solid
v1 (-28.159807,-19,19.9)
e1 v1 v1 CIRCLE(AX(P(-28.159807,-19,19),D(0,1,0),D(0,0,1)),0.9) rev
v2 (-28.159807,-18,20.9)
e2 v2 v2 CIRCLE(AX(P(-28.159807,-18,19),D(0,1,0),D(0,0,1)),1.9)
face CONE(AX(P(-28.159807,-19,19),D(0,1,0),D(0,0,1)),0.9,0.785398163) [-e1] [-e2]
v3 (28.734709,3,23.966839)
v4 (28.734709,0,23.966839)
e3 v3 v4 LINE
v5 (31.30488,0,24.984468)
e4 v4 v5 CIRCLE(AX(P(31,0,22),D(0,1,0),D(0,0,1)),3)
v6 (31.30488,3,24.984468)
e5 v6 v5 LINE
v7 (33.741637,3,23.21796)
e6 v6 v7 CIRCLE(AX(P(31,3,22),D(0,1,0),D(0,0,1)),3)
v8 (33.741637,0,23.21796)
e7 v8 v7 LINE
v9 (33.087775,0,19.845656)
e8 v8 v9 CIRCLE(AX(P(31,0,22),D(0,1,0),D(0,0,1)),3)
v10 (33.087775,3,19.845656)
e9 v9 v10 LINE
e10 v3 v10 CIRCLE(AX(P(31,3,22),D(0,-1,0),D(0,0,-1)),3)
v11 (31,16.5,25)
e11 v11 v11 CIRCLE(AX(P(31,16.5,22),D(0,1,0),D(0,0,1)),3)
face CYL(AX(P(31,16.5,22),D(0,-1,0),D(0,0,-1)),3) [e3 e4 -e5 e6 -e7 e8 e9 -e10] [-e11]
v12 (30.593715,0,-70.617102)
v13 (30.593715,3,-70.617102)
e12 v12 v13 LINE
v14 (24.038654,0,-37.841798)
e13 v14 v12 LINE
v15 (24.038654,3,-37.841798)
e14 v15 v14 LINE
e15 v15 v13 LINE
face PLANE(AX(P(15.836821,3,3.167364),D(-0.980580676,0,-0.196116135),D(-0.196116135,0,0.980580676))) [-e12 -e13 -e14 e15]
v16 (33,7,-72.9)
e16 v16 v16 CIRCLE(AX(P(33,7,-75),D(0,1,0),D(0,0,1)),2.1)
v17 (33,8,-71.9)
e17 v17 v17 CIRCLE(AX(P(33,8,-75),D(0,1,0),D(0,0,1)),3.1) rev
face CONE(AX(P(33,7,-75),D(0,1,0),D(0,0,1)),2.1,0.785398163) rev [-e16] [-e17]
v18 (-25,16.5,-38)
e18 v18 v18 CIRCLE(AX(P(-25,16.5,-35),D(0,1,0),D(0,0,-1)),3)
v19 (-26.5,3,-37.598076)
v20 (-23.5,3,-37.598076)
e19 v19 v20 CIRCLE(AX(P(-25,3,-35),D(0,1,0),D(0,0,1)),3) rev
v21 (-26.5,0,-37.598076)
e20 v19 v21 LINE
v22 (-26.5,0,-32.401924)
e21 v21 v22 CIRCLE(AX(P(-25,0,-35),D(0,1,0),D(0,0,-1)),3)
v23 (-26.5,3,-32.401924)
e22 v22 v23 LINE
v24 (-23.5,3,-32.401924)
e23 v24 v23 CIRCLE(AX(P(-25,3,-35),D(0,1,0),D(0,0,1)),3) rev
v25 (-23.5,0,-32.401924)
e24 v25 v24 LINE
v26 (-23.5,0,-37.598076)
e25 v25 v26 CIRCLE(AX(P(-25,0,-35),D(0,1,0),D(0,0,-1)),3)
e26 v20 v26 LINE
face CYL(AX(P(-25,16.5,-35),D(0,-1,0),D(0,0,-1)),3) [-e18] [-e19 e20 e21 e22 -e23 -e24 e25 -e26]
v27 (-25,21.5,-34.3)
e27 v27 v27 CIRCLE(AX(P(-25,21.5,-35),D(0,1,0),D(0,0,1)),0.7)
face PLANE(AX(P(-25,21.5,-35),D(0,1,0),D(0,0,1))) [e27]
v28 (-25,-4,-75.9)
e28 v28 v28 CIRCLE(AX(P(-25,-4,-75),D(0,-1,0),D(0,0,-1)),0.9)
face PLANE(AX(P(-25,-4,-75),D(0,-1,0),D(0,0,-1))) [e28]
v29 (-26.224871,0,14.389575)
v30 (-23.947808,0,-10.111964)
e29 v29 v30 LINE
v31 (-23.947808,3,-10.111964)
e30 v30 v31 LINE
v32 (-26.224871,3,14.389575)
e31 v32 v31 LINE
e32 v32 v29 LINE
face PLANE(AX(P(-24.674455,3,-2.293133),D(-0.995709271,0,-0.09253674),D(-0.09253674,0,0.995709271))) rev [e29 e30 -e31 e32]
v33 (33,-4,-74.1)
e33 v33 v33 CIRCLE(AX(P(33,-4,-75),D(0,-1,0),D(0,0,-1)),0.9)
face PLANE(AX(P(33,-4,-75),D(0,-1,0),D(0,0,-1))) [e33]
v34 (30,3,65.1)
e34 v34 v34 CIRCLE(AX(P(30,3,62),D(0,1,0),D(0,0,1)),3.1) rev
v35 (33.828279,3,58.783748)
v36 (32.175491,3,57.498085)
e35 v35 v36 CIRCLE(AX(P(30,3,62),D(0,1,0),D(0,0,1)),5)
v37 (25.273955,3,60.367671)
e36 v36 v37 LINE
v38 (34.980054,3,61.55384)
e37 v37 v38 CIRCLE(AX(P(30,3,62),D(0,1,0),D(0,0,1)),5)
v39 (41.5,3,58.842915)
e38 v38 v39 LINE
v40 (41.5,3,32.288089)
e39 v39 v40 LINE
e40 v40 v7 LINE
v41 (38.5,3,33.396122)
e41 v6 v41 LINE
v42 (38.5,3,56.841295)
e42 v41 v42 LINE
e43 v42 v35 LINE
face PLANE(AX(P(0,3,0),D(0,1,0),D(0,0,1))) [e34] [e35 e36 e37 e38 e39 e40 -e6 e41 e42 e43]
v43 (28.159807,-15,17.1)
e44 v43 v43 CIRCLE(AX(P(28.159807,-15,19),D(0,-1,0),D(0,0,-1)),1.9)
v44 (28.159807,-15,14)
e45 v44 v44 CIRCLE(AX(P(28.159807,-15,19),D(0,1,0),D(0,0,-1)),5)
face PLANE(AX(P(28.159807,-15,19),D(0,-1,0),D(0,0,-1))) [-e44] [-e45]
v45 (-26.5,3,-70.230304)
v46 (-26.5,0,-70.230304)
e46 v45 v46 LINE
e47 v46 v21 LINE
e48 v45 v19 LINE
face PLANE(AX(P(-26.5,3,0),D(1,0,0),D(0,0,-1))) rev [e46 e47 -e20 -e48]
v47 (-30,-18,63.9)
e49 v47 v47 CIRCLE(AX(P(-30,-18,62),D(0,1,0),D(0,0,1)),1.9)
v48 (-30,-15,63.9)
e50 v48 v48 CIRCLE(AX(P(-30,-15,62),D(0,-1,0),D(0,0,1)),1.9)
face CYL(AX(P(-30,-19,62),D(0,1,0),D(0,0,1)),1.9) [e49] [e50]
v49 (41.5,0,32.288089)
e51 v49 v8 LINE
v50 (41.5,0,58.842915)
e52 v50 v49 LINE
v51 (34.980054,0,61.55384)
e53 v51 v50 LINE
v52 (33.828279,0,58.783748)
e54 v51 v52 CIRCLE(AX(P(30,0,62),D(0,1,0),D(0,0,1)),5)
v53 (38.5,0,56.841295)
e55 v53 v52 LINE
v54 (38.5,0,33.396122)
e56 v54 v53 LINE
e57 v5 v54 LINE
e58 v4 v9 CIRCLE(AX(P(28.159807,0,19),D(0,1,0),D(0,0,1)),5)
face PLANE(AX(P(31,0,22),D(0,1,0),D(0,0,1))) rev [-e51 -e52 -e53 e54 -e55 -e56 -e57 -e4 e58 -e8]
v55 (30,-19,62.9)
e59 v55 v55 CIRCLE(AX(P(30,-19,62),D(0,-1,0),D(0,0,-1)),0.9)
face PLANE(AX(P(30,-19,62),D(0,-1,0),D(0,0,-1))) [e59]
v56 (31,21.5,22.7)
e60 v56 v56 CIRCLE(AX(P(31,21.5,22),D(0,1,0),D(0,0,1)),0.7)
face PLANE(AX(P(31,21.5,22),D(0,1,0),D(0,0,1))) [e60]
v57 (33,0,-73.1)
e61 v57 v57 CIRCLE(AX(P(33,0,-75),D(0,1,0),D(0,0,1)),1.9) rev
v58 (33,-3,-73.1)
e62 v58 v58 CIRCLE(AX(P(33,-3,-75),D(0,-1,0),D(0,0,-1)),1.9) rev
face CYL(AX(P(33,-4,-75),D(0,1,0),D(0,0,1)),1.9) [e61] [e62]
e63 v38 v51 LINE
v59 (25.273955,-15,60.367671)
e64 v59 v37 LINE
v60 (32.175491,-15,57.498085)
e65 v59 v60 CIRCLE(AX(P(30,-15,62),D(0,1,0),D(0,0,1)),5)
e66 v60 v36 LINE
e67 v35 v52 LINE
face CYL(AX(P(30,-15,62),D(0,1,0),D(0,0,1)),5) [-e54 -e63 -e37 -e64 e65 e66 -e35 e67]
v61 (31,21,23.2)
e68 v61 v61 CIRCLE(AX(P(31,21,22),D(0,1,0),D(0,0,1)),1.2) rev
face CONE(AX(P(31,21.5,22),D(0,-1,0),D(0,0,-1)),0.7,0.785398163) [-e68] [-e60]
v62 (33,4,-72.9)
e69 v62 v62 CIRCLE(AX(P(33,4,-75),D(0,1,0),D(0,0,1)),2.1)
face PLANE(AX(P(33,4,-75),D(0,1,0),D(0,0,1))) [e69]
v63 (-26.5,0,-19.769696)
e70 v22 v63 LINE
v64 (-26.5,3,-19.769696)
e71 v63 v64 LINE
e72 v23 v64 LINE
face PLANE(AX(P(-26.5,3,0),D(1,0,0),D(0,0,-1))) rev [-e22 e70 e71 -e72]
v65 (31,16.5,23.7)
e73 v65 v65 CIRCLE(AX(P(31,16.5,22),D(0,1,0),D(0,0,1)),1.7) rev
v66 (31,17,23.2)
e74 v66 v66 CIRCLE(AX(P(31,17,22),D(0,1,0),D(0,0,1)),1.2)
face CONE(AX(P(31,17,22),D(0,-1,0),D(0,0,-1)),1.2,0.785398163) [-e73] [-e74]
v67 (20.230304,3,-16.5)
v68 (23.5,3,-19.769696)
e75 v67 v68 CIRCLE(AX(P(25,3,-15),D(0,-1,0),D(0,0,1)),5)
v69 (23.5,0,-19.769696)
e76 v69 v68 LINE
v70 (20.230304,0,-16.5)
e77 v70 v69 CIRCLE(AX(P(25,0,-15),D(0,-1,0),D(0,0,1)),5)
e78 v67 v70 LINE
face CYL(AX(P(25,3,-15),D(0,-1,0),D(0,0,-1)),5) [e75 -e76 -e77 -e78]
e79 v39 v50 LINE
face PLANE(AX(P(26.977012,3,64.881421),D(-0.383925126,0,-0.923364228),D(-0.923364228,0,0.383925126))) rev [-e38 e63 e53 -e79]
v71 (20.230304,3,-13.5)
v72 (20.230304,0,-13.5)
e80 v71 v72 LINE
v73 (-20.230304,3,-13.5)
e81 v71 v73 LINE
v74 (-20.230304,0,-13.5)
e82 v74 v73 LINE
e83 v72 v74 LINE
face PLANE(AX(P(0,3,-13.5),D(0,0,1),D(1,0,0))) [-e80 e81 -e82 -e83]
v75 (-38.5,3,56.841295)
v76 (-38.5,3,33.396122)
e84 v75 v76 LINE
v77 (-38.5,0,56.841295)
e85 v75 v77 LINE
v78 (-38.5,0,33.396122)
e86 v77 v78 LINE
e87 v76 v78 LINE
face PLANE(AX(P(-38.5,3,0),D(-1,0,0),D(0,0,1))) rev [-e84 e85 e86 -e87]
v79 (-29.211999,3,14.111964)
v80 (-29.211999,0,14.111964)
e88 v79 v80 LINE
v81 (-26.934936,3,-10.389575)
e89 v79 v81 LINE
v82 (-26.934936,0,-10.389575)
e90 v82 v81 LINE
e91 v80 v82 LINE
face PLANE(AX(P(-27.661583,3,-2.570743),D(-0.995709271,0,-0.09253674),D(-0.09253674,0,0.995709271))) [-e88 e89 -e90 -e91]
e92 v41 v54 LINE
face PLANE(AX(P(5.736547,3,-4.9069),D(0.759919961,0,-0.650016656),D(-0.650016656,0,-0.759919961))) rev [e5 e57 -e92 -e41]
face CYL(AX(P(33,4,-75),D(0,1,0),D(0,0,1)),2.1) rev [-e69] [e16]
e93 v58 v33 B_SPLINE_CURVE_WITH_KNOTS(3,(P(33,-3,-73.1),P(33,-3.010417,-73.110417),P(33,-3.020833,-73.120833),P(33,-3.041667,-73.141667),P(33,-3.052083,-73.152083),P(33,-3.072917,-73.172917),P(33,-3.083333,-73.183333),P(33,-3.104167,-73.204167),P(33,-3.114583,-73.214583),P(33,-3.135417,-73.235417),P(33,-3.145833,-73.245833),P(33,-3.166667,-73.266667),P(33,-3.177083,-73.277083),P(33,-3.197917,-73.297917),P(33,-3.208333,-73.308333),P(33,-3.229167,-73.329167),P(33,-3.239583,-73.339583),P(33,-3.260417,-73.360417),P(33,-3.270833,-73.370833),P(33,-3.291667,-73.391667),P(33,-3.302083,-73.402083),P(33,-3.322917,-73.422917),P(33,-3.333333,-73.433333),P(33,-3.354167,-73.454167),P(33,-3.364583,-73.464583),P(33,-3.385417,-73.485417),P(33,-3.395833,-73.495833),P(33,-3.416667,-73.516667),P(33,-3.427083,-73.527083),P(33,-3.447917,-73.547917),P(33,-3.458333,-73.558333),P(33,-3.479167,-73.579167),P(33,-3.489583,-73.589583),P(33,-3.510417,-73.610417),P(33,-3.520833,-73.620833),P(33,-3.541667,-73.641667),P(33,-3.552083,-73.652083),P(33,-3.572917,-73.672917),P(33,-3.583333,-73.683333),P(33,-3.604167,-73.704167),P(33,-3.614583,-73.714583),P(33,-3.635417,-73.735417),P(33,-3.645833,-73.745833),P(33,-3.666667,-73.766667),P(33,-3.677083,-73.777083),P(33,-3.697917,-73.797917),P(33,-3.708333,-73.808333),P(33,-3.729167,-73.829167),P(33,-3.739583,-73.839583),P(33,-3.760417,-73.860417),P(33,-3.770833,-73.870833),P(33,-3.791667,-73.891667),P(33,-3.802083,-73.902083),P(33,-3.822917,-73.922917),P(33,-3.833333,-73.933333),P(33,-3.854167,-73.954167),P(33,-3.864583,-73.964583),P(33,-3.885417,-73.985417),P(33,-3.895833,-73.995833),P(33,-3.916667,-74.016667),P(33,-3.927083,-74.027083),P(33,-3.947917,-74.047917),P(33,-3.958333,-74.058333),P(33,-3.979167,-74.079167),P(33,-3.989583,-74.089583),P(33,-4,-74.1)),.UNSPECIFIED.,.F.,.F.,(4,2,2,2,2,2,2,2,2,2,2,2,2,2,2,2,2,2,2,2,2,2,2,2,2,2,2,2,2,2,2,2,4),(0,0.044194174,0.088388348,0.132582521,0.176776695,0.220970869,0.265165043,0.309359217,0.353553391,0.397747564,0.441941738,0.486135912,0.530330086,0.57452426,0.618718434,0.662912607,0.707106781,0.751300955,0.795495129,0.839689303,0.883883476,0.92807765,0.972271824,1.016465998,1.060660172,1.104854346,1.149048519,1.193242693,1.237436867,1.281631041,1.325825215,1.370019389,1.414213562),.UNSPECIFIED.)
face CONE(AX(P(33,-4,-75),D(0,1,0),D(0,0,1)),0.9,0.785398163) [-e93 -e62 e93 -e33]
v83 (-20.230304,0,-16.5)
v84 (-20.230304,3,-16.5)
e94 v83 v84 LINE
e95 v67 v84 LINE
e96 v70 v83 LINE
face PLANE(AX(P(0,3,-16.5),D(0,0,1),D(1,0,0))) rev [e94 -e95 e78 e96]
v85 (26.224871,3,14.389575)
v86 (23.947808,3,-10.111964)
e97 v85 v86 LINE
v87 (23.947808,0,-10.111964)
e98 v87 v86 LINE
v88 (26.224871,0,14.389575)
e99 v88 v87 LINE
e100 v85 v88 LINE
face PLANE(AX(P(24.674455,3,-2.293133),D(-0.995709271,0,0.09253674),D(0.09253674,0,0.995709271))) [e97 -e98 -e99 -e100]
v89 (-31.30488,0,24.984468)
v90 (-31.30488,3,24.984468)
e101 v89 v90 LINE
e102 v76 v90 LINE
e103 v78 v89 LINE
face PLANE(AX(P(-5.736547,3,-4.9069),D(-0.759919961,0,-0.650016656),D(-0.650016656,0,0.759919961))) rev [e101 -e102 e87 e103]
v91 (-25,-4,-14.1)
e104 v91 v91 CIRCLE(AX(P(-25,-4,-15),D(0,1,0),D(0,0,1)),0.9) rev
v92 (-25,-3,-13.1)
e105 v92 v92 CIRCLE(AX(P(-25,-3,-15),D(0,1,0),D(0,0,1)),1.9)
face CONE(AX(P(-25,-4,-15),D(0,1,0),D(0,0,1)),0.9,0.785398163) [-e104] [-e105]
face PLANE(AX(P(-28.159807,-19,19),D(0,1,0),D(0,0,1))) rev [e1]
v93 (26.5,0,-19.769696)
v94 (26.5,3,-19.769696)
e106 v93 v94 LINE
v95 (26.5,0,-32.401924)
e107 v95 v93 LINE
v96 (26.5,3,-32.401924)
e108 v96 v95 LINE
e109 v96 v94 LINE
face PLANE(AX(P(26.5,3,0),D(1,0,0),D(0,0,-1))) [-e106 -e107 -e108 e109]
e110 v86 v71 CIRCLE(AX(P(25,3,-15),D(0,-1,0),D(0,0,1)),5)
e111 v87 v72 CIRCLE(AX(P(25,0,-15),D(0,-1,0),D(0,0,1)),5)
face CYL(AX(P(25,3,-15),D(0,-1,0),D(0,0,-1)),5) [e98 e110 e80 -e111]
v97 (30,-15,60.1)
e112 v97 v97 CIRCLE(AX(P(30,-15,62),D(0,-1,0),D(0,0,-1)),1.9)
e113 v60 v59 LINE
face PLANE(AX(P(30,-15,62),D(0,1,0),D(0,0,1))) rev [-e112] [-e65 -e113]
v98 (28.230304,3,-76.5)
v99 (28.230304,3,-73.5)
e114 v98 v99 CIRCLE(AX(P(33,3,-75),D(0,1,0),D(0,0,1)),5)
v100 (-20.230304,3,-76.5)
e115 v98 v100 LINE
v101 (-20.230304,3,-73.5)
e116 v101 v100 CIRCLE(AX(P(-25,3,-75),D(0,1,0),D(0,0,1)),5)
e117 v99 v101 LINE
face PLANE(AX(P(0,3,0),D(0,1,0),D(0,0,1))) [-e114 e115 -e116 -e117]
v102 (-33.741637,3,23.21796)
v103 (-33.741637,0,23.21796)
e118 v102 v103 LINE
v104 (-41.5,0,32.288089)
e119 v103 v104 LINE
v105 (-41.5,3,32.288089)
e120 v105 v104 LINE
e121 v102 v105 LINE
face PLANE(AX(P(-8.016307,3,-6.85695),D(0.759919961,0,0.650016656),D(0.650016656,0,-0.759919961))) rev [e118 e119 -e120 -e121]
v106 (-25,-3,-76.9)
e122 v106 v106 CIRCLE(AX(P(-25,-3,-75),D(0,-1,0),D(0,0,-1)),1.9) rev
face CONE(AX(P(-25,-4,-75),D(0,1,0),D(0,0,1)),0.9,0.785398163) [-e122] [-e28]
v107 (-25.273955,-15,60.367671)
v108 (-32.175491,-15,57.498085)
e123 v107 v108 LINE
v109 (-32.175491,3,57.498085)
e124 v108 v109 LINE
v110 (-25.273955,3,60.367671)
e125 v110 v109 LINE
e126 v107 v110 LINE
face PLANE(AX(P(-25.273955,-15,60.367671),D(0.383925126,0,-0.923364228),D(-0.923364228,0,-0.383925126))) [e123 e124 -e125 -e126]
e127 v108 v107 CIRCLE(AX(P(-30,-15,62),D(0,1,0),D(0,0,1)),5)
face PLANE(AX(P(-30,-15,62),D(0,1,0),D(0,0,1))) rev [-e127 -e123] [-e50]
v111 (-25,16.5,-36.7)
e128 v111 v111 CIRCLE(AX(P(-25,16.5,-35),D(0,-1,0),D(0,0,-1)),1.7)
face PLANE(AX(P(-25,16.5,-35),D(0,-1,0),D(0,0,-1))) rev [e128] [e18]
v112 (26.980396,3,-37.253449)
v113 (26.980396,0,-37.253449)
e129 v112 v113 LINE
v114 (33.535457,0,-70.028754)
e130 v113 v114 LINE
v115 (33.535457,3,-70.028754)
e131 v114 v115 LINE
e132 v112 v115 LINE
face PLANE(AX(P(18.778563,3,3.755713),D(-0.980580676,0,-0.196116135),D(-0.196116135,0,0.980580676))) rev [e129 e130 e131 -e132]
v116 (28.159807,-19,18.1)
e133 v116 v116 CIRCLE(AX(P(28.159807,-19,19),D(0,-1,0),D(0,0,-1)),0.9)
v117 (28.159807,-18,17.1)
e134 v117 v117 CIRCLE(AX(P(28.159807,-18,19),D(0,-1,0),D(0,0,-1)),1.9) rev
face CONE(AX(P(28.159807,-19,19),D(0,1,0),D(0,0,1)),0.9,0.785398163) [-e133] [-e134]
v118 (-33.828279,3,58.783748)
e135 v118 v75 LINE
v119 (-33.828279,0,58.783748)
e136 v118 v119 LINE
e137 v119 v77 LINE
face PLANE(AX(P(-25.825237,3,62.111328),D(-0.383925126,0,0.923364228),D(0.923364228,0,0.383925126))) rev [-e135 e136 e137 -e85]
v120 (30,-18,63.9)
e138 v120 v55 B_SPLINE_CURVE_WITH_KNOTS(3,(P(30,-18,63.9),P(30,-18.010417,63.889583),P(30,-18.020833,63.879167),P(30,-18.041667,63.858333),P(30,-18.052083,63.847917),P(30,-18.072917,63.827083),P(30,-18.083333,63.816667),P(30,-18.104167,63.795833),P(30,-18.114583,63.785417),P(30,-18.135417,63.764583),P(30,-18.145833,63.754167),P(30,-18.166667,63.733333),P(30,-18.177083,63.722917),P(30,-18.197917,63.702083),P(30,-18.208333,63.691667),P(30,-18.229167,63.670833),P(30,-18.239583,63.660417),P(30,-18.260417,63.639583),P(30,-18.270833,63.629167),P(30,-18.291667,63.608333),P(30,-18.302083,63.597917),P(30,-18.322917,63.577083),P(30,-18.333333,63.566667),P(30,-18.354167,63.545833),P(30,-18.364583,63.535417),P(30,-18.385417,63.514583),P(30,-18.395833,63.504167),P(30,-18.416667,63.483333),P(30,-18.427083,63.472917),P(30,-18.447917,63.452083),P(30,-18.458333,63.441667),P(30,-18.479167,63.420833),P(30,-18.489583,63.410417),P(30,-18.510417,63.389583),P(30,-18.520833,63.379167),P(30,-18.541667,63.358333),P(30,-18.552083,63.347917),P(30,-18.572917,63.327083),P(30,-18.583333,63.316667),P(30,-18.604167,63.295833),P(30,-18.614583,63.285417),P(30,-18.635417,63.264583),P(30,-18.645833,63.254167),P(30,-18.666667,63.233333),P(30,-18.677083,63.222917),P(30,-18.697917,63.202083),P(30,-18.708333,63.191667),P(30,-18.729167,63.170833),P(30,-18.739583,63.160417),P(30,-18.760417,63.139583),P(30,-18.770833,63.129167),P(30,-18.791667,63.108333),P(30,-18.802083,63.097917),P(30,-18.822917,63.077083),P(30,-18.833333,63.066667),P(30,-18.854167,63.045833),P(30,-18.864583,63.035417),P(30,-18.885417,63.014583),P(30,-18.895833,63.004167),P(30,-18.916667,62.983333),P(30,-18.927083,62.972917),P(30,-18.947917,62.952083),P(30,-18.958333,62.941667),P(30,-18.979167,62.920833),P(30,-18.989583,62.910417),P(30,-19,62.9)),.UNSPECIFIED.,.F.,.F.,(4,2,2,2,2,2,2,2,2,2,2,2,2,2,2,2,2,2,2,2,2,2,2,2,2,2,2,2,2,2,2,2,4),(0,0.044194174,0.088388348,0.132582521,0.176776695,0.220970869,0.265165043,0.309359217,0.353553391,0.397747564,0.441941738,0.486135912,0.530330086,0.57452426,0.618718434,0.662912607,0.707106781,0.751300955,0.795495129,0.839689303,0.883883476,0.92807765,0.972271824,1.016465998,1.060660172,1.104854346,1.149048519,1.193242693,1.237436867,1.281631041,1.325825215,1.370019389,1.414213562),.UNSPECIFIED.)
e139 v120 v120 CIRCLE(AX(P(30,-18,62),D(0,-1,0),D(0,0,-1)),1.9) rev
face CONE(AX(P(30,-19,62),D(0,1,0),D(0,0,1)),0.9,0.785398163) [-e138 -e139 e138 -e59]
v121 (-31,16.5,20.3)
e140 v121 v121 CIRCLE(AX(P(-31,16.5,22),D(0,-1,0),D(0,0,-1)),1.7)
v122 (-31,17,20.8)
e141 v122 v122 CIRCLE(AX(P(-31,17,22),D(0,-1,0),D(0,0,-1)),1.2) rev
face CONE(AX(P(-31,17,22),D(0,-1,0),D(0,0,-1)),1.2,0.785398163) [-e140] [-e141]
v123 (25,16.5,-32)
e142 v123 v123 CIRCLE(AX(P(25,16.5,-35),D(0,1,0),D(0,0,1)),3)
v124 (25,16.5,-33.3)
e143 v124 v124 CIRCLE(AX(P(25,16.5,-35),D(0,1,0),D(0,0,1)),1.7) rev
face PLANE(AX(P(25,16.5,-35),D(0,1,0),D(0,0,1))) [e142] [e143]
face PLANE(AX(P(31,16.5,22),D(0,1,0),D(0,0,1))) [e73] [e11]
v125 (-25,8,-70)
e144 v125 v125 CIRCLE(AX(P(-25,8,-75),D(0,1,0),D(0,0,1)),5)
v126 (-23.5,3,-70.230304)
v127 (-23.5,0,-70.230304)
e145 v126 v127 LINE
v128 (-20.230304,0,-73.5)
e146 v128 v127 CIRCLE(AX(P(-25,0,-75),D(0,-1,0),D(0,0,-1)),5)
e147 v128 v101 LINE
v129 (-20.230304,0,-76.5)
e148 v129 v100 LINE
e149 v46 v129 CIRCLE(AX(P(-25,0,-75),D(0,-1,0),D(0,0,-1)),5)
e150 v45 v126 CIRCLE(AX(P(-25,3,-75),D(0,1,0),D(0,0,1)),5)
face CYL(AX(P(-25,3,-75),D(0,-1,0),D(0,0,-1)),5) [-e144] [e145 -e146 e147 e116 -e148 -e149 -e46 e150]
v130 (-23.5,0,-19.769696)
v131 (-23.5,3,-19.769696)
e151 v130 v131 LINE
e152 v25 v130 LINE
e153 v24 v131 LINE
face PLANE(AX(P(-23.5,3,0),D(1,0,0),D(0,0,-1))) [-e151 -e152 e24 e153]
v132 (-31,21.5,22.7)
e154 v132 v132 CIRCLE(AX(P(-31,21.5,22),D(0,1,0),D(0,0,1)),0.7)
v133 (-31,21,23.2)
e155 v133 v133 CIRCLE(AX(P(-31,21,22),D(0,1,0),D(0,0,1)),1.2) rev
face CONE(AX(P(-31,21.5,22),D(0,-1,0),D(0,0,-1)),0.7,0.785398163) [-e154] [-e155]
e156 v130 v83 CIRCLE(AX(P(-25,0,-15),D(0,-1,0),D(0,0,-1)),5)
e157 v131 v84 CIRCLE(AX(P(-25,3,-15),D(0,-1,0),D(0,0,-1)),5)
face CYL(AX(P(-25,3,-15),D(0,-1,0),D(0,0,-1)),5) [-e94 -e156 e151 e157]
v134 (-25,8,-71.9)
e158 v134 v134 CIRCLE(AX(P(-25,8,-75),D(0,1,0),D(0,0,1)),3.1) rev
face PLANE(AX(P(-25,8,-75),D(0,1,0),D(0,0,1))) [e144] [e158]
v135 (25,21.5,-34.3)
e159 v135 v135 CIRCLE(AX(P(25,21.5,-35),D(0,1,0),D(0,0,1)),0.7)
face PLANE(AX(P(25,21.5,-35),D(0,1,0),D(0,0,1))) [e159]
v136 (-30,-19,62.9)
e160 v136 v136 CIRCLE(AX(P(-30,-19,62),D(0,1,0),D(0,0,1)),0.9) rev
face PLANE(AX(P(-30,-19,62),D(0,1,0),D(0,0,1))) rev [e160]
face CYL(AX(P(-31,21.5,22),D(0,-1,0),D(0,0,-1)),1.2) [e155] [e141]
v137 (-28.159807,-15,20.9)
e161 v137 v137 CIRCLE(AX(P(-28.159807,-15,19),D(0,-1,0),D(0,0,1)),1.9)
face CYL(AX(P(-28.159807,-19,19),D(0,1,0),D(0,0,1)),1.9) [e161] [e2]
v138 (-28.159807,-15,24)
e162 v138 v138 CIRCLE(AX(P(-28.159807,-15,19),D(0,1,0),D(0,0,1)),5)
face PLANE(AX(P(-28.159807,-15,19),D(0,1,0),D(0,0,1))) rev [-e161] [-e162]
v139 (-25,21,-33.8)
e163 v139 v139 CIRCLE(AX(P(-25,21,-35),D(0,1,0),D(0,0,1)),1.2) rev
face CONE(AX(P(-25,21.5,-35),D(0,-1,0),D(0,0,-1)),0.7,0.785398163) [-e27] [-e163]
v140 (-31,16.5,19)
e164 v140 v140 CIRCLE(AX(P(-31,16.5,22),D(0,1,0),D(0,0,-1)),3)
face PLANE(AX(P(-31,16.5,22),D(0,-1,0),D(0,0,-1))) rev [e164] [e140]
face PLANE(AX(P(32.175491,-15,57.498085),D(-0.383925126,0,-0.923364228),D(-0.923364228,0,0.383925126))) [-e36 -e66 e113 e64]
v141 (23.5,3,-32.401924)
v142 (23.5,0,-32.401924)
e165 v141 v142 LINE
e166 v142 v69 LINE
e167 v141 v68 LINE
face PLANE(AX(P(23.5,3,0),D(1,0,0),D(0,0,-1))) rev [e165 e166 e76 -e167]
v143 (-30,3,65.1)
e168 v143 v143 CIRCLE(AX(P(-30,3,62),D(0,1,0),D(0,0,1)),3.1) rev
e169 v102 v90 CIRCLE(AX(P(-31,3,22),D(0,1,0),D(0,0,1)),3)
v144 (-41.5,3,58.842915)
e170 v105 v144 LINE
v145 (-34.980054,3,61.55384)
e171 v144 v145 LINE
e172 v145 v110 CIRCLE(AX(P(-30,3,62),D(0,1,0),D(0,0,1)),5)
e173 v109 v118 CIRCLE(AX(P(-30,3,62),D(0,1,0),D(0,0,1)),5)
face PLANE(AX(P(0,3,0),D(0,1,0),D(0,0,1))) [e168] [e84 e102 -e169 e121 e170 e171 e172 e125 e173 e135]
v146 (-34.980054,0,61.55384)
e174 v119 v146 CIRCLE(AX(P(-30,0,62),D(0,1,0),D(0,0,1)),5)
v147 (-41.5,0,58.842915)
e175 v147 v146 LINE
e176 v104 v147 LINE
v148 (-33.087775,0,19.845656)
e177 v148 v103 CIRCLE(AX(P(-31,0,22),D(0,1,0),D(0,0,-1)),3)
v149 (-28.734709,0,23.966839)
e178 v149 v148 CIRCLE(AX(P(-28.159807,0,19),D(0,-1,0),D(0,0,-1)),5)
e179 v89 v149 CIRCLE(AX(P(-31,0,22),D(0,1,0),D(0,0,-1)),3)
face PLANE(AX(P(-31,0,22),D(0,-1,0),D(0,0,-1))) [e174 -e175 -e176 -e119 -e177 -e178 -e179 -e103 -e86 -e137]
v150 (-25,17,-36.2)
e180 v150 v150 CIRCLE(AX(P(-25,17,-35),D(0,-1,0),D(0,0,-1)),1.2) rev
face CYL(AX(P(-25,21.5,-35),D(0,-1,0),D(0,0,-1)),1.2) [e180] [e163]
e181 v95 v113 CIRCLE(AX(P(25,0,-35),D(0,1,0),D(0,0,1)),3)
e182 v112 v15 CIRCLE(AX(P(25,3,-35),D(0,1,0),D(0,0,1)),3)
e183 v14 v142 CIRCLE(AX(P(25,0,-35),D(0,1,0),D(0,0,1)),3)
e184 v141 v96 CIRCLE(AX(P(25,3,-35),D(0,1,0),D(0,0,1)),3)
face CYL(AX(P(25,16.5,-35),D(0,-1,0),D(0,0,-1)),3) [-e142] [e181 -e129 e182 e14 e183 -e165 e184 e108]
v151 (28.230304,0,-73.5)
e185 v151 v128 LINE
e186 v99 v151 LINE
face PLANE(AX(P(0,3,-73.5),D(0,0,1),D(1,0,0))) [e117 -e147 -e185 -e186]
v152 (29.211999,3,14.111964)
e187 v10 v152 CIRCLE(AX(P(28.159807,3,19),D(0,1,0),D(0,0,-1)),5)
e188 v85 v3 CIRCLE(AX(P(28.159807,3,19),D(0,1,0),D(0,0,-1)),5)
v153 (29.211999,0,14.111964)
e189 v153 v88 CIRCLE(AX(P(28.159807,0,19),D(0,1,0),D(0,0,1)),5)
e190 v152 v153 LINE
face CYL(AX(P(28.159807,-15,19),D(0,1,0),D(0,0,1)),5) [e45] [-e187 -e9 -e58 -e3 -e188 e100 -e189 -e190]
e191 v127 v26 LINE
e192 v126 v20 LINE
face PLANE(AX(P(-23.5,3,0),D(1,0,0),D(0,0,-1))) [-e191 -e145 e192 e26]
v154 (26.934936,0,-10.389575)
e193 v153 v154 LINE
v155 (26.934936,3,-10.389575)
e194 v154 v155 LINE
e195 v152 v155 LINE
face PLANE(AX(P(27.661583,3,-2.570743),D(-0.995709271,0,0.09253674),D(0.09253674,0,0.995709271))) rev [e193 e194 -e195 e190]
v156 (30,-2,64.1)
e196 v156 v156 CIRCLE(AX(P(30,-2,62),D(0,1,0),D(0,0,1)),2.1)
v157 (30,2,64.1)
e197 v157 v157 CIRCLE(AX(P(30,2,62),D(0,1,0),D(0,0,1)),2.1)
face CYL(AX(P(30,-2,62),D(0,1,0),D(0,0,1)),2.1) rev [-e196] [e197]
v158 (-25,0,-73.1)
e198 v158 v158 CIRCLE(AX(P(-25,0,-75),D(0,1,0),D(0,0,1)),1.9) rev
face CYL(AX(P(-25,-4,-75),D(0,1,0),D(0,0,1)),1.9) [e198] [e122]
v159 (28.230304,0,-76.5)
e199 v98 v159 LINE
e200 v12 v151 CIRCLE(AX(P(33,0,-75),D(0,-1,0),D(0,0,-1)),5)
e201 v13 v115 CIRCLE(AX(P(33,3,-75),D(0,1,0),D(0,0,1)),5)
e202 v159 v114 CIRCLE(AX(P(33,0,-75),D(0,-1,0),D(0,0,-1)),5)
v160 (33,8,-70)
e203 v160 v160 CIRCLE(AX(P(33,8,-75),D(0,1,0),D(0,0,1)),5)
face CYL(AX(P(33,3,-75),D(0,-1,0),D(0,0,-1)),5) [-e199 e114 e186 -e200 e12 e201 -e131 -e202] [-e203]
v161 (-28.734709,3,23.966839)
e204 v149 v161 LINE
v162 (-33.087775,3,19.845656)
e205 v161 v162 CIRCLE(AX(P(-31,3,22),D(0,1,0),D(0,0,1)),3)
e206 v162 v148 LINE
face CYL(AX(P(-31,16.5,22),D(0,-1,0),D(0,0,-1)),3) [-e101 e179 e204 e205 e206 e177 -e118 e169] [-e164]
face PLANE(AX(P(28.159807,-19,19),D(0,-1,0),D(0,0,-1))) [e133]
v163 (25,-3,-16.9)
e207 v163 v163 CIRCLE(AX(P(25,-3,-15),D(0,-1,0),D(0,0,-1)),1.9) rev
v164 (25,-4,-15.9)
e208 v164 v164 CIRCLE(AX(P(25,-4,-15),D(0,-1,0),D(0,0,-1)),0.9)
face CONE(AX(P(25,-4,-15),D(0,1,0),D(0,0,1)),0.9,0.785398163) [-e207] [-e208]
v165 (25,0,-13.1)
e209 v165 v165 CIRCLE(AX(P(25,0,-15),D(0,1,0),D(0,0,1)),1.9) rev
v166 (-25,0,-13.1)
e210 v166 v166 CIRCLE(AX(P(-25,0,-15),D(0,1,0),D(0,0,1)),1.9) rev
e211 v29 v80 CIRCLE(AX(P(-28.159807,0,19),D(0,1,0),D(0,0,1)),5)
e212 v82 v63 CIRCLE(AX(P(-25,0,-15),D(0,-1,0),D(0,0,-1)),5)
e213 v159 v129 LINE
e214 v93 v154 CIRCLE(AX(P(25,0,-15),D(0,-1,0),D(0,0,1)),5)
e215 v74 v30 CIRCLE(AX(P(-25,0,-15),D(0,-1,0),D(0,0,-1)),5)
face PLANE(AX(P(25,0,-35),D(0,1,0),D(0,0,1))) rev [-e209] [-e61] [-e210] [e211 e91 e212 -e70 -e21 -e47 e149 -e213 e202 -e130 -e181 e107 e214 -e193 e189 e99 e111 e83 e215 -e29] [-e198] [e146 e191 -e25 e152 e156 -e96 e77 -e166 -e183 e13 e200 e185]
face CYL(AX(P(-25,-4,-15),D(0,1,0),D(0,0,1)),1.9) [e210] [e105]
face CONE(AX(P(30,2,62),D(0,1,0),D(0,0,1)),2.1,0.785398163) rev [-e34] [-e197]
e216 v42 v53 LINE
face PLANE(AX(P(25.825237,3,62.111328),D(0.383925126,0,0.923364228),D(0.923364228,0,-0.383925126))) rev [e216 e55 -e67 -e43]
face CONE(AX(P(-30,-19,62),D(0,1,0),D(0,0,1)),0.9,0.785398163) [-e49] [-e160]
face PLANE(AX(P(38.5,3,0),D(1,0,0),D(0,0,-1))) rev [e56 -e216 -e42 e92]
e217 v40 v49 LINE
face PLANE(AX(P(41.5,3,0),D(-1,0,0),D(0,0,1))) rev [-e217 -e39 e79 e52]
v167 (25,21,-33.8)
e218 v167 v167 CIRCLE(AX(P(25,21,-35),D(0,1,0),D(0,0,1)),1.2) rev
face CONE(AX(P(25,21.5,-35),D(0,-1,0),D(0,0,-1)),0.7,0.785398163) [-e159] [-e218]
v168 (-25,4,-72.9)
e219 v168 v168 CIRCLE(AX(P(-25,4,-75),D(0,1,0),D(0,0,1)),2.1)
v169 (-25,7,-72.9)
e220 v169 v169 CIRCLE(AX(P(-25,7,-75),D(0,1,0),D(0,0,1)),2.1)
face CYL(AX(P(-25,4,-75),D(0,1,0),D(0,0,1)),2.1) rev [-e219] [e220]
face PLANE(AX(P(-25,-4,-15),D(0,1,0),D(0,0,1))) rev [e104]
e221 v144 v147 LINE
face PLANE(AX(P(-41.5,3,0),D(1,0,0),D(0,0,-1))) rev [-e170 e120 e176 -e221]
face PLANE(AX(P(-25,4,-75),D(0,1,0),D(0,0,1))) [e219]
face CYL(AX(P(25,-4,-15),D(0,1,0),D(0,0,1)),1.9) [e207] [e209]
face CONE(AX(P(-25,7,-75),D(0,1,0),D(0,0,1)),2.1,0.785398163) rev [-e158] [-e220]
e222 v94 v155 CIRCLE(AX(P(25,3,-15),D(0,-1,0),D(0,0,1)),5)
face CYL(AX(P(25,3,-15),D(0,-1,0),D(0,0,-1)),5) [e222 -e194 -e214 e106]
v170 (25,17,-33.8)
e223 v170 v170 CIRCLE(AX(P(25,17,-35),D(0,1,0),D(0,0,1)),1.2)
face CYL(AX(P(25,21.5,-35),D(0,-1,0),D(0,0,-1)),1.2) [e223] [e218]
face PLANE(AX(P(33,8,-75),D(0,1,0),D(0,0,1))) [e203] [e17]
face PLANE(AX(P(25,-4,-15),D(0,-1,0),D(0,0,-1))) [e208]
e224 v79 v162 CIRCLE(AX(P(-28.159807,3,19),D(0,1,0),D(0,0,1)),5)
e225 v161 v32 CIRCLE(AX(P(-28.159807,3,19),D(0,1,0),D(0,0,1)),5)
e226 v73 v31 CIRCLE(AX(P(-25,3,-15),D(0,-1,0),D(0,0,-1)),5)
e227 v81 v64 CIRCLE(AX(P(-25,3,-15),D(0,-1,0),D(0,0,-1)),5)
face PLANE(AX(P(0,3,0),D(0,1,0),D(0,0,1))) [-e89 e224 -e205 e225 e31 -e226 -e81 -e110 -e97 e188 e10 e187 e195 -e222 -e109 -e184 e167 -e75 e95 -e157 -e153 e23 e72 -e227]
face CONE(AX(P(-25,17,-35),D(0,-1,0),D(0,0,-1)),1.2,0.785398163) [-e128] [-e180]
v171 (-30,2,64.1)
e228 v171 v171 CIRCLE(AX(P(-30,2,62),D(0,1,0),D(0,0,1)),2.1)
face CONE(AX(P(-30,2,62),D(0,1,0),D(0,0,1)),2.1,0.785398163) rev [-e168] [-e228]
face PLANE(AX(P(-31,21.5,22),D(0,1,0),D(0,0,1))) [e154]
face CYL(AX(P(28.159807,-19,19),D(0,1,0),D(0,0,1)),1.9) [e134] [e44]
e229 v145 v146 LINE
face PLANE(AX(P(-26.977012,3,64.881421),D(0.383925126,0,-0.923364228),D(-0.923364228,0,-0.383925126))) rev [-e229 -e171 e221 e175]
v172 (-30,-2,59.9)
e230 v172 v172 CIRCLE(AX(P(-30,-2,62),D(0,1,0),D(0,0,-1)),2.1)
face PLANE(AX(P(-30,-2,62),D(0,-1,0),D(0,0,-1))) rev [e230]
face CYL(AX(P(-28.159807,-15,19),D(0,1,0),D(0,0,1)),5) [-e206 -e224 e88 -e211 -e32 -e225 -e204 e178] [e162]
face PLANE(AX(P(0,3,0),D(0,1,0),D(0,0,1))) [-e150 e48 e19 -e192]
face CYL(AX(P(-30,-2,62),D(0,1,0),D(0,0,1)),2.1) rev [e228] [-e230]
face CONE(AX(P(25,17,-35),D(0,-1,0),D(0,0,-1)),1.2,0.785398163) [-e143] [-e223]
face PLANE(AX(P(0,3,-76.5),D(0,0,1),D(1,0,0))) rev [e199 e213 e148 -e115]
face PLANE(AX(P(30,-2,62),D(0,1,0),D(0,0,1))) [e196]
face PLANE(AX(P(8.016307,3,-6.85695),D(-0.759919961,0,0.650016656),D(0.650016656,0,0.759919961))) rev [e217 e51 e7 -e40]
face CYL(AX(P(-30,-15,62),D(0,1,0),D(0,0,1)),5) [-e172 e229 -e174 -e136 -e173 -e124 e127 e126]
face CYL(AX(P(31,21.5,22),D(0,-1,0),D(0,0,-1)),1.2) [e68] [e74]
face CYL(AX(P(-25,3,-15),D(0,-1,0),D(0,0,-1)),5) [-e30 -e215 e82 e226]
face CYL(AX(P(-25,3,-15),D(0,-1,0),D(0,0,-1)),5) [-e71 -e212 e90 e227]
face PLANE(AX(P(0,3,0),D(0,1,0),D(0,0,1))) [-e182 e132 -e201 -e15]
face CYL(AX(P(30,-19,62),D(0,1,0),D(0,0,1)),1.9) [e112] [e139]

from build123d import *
from build123d.topology import SkipClean

# Parameters (mm, degrees)
SKETCH_2_R             = 3
EXTRUDE_1_DEPTH        = 16.5
EXTRUDE_1_2_DEPTH      = 16.5
EXTRUDE_1_3_DEPTH      = 16.5
EXTRUDE_1_4_DEPTH      = 16.5
SKETCH_3_R             = 1.2
EXTRUDE_2_DEPTH        = 5
SKETCH_4_R             = 5
EXTRUDE_3_DEPTH        = 3
EXTRUDE_3_2_DEPTH      = 3
EXTRUDE_3_3_DEPTH      = 3
EXTRUDE_3_4_DEPTH      = 3
EXTRUDE_4_DEPTH        = 3
EXTRUDE_4_DEPTH_BACK   = 15
SKETCH_6_R             = 5
EXTRUDE_5_DEPTH        = 3
EXTRUDE_5_DEPTH_BACK   = 15
EXTRUDE_5_2_DEPTH      = 3
EXTRUDE_5_2_DEPTH_BACK = 15
EXTRUDE_6_DEPTH        = 3
SKETCH_9_R             = 1.9
EXTRUDE_7_DEPTH        = 4
SKETCH_10_R            = 1.9
EXTRUDE_8_DEPTH        = 4
CHAMFER_1_SIZE         = 1
SKETCH_11_R            = 5
EXTRUDE_9_DEPTH        = 5
SKETCH_12_R            = 2.1
CUT_EXTRUDE_1_DEPTH    = 5
SKETCH_13_R            = 2.1
CUT_EXTRUDE_2_DEPTH    = 4
CHAMFER_2_SIZE         = 1
CHAMFER_3_SIZE         = 0.5


with BuildPart() as part:
    # 스케치2 → 보스-돌출1 (new body)
    with BuildSketch(Plane(origin=(0, 0, 0), x_dir=(1, 0, 0), z_dir=(0, 1, 0))):
        with Locations(Location((25, 35, 0), (0, 0, 270))):
            Circle(SKETCH_2_R)
    extrude(amount=EXTRUDE_1_DEPTH)



with BuildPart() as body_2:
    # 스케치2 → Extrude 1 2 (new body)
    with BuildSketch(Plane(origin=(0, 0, 0), x_dir=(1, 0, 0), z_dir=(0, 1, 0))):
        with Locations(Location((31, -22, 0), (0, 0, 270))):
            Circle(SKETCH_2_R)
    extrude(amount=EXTRUDE_1_2_DEPTH)


with BuildPart() as body_3:
    # 스케치2 → Extrude 1 3 (new body)
    with BuildSketch(Plane(origin=(0, 0, 0), x_dir=(1, 0, 0), z_dir=(0, 1, 0))):
        with Locations(Location((-31, -22, 0), (0, 0, 90))):
            Circle(SKETCH_2_R)
    extrude(amount=EXTRUDE_1_3_DEPTH)


with BuildPart() as body_4:
    # 스케치2 → Extrude 1 4 (new body)
    with BuildSketch(Plane(origin=(0, 0, 0), x_dir=(1, 0, 0), z_dir=(0, 1, 0))):
        with Locations(Location((-25, 35, 0), (0, 0, 90))):
            Circle(SKETCH_2_R)
    extrude(amount=EXTRUDE_1_4_DEPTH)


with BuildPart() as part_1:
    add(part.part)

    add(body_2.part)  # 보스-돌출2 merges body 2

    add(body_3.part)  # 보스-돌출2 merges body 3

    add(body_4.part)  # 보스-돌출2 merges body 4
    # 스케치3 → 보스-돌출2 (add)
    with BuildSketch(Plane(origin=(0, 16.5, 0), x_dir=(1, 0, 0), z_dir=(0, 1, 0))):
        with Locations(Location((-31, -22, 0), (0, 0, 270))):
            Circle(SKETCH_3_R)
        with Locations(Location((-25, 35, 0), (0, 0, 270))):
            Circle(SKETCH_3_R)
        with Locations(Location((25, 35, 0), (0, 0, 270))):
            Circle(SKETCH_3_R)
        with Locations(Location((31, -22, 0), (0, 0, 270))):
            Circle(SKETCH_3_R)
    extrude(amount=EXTRUDE_2_DEPTH)

    # 스케치6 → 보스-돌출4 (add, two sides: drawn at the far end of the back side and taken through both)
    with BuildSketch(Plane(origin=(0, 0, 0), x_dir=(1, 0, 0), z_dir=(0, 1, 0)).offset(-EXTRUDE_4_DEPTH_BACK)):
        with Locations(Location((-28.159807037, -19, 0), (0, 0, 270))):
            Circle(SKETCH_6_R)
        with Locations(Location((28.159807037, -19, 0), (0, 0, 276.602489978))):
            Circle(SKETCH_6_R)
    extrude(amount=EXTRUDE_4_DEPTH + EXTRUDE_4_DEPTH_BACK)



with BuildPart() as body_2_2:
    # 스케치4 → 보스-돌출3 (new body)
    with BuildSketch(Plane.XZ):
        with Locations(Location((-25, -15, 0), (0, 0, 270))):
            Circle(SKETCH_4_R)
    extrude(amount=-EXTRUDE_3_DEPTH)


with BuildPart() as body_3_2:
    # 스케치4 → Extrude 3 2 (new body)
    with BuildSketch(Plane.XZ):
        with Locations(Location((-25, -75, 0), (0, 0, 270))):
            Circle(SKETCH_4_R)
    extrude(amount=-EXTRUDE_3_2_DEPTH)


with BuildPart() as body_4_2:
    # 스케치4 → Extrude 3 3 (new body)
    with BuildSketch(Plane.XZ):
        with Locations(Location((25, -15, 0), (0, 0, 90))):
            Circle(SKETCH_4_R)
    extrude(amount=-EXTRUDE_3_3_DEPTH)


with BuildPart() as body_5:
    # 스케치4 → Extrude 3 4 (new body)
    with BuildSketch(Plane.XZ):
        with Locations(Location((33, -75, 0), (0, 0, 270))):
            Circle(SKETCH_4_R)
    extrude(amount=-EXTRUDE_3_4_DEPTH)


with BuildPart() as body_6:
    # 스케치7 → 보스-돌출5 (new, two sides: drawn at the far end of the back side and taken through both)
    with BuildSketch(Plane(origin=(0, 0, 0), x_dir=(1, 0, 0), z_dir=(0, 1, 0)).offset(-EXTRUDE_5_DEPTH_BACK)):
        with BuildLine():
            Line((32.175491387, -57.49808516), (25.273954776, -60.367671435))
            ThreePointArc((25.273954776, -60.367671435), (31.919625632, -66.61682114), (32.175491387, -57.49808516))
        make_face()
    extrude(amount=EXTRUDE_5_DEPTH + EXTRUDE_5_DEPTH_BACK)


with BuildPart() as body_7:
    # 스케치7 → Extrude 5 2 (new, two sides: drawn at the far end of the back side and taken through both)
    with BuildSketch(Plane(origin=(0, 0, 0), x_dir=(1, 0, 0), z_dir=(0, 1, 0)).offset(-EXTRUDE_5_2_DEPTH_BACK)):
        with BuildLine():
            Line((-25.273954776, -60.367671435), (-32.175491387, -57.49808516))
            ThreePointArc((-32.175491387, -57.49808516), (-31.919625632, -66.61682114), (-25.273954776, -60.367671435))
        make_face()
    extrude(amount=EXTRUDE_5_2_DEPTH + EXTRUDE_5_2_DEPTH_BACK)


with BuildPart() as part_2:
    add(part_1.part)

    add(body_2_2.part)  # 보스-돌출6 merges body 2 2

    add(body_3_2.part)  # 보스-돌출6 merges body 3 2

    add(body_4_2.part)  # 보스-돌출6 merges body 4 2

    add(body_5.part)  # 보스-돌출6 merges body 5

    add(body_6.part)  # 보스-돌출6 merges body 6

    add(body_7.part)  # 보스-돌출6 merges body 7
    # 스케치8 → 보스-돌출6 (add)
    with BuildSketch(Plane(origin=(0, 0, 0), x_dir=(1, 0, 0), z_dir=(0, 1, 0))):
        with BuildLine():
            Line((38.5, -33.396121926), (38.5, -56.841295093))
            Line((38.5, -56.841295093), (33.828278981, -58.783747516))
            ThreePointArc((33.828278981, -58.783747516), (34.61682114, -60.080374368), (34.98005436, -61.5538402))
            Line((34.98005436, -61.5538402), (41.5, -58.842915434))
            Line((41.5, -58.842915434), (41.5, -32.2880886))
            Line((41.5, -32.2880886), (32.400068827, -21.64956222))
            ThreePointArc((32.400068827, -21.64956222), (31.409890316, -22.799599805), (30.120308944, -23.599612187))
            Line((30.120308944, -23.599612187), (38.5, -33.396121926))
        make_face()
        with BuildLine():
            Line((-41.5, -32.2880886), (-41.5, -58.842915434))
            Line((-41.5, -58.842915434), (-34.98005436, -61.5538402))
            ThreePointArc((-34.98005436, -61.5538402), (-34.61682114, -60.080374368), (-33.828278981, -58.783747516))
            Line((-33.828278981, -58.783747516), (-38.5, -56.841295093))
            Line((-38.5, -56.841295093), (-38.5, -33.396121926))
            Line((-38.5, -33.396121926), (-30.120308944, -23.599612187))
            ThreePointArc((-30.120308944, -23.599612187), (-31.409890316, -22.799599805), (-32.400068827, -21.64956222))
            Line((-32.400068827, -21.64956222), (-41.5, -32.2880886))
        make_face()
        with BuildLine():
            ThreePointArc((26.224871012, -14.389574577), (27.697123337, -14.021453647), (29.211998824, -14.111964357))
            Line((29.211998824, -14.111964357), (26.934936025, 10.389574577))
            ThreePointArc((26.934936025, 10.389574577), (25.4626837, 10.021453647), (23.947808213, 10.111964357))
            Line((23.947808213, 10.111964357), (26.224871012, -14.389574577))
        make_face()
        with BuildLine():
            ThreePointArc((23.5, 19.769696007), (25, 20), (26.5, 19.769696007))
            Line((26.5, 19.769696007), (26.5, 32.401923789))
            ThreePointArc((26.5, 32.401923789), (25, 32), (23.5, 32.401923789))
            Line((23.5, 32.401923789), (23.5, 19.769696007))
        make_face()
        with BuildLine():
            Line((-20.230303993, 13.5), (20.230303993, 13.5))
            ThreePointArc((20.230303993, 13.5), (20, 15), (20.230303993, 16.5))
            Line((20.230303993, 16.5), (-20.230303993, 16.5))
            ThreePointArc((-20.230303993, 16.5), (-20, 15), (-20.230303993, 13.5))
        make_face()
        with BuildLine():
            Line((-26.224871012, -14.389574577), (-23.947808213, 10.111964357))
            ThreePointArc((-23.947808213, 10.111964357), (-25.4626837, 10.021453647), (-26.934936025, 10.389574577))
            Line((-26.934936025, 10.389574577), (-29.211998824, -14.111964357))
            ThreePointArc((-29.211998824, -14.111964357), (-27.697123337, -14.021453647), (-26.224871012, -14.389574577))
        make_face()
        with BuildLine():
            ThreePointArc((24.038653652, 37.84179753), (25.588348405, 37.941742027), (26.980395679, 37.253449124))
            Line((26.980395679, 37.253449124), (33.535456667, 70.028754064))
            ThreePointArc((33.535456667, 70.028754064), (32.019419324, 70.097096622), (30.59371464, 70.617102469))
            Line((30.59371464, 70.617102469), (24.038653652, 37.84179753))
        make_face()
        with BuildLine():
            ThreePointArc((-26.5, 19.769696007), (-25, 20), (-23.5, 19.769696007))
            Line((-23.5, 19.769696007), (-23.5, 32.401923789))
            ThreePointArc((-23.5, 32.401923789), (-25, 32), (-26.5, 32.401923789))
            Line((-26.5, 32.401923789), (-26.5, 19.769696007))
        make_face()
        with BuildLine():
            Line((-20.230303993, 73.5), (28.230303993, 73.5))
            ThreePointArc((28.230303993, 73.5), (28, 75), (28.230303993, 76.5))
            Line((28.230303993, 76.5), (-20.230303993, 76.5))
            ThreePointArc((-20.230303993, 76.5), (-20, 75), (-20.230303993, 73.5))
        make_face()
        with BuildLine():
            Line((-26.5, 70.230303993), (-26.5, 37.598076211))
            ThreePointArc((-26.5, 37.598076211), (-25, 38), (-23.5, 37.598076211))
            Line((-23.5, 37.598076211), (-23.5, 70.230303993))
            ThreePointArc((-23.5, 70.230303993), (-25, 70), (-26.5, 70.230303993))
        make_face()
    extrude(amount=EXTRUDE_6_DEPTH)

    # 스케치9 → 보스-돌출7 (add)
    with BuildSketch(Plane.XZ.offset(15)):
        with Locations(Location((28.159807037, 19, 0), (0, 0, 270))):
            Circle(SKETCH_9_R)
        with Locations(Location((30, 62, 0), (0, 0, 270))):
            Circle(SKETCH_9_R)
        with Locations(Location((-28.159807037, 19, 0), (0, 0, 90))):
            Circle(SKETCH_9_R)
        with Locations(Location((-30, 62, 0), (0, 0, 90))):
            Circle(SKETCH_9_R)
    extrude(amount=EXTRUDE_7_DEPTH)

    # 스케치10 → 보스-돌출8 (add)
    with BuildSketch(Plane.XZ):
        with Locations(Location((25, -15, 0), (0, 0, 90))):
            Circle(SKETCH_10_R)
        with Locations(Location((33, -75, 0), (0, 0, 90))):
            Circle(SKETCH_10_R)
        with Locations(Location((-25, -75, 0), (0, 0, 90))):
            Circle(SKETCH_10_R)
        with Locations(Location((-25, -15, 0), (0, 0, 90))):
            Circle(SKETCH_10_R)
    extrude(amount=EXTRUDE_8_DEPTH)

    # 모따기1
    chamfer_1_edges = [part_2.edges().sort_by_distance(p)[0] for p in [
        (28.159807037, -19, 20.9),
        (30, -19, 63.9),
        (-28.159807037, -19, 17.1),
        (-30, -19, 60.1),
        (25, -4, -16.9),
        (33, -4, -76.9),
        (-25, -4, -76.9),
        (-25, -4, -16.9),
    ]]
    chamfer(chamfer_1_edges, length=CHAMFER_1_SIZE)

    # 스케치11 → 보스-돌출9 (add)
    with SkipClean():  # the faces are left unmerged after this step: merging them gives an invalid solid
        with BuildSketch(Plane(origin=(0, 3, 0), x_dir=(1, 0, 0), z_dir=(0, 1, 0))):
            with Locations(Location((33, 75, 0), (0, 0, 162.542396876))):
                Circle(SKETCH_11_R)
            with Locations(Location((-25, 75, 0), (0, 0, 17.457603124))):
                Circle(SKETCH_11_R)
        extrude(amount=EXTRUDE_9_DEPTH)
    add(part_2.part.scale(1), mode=Mode.REPLACE)  # the faces are merged on a copy

    # 스케치12 → 컷-돌출1 (cut)
    with BuildSketch(Plane(origin=(0, 3, 0), x_dir=(1, 0, 0), z_dir=(0, 1, 0))):
        with Locations(Location((30, -62, 0), (0, 0, 270))):
            Circle(SKETCH_12_R)
        with Locations(Location((-30, -62, 0), (0, 0, 90))):
            Circle(SKETCH_12_R)
    extrude(amount=-CUT_EXTRUDE_1_DEPTH, mode=Mode.SUBTRACT)

    # 스케치13 → 컷-돌출2 (cut)
    with BuildSketch(Plane(origin=(0, 8, 0), x_dir=(1, 0, 0), z_dir=(0, 1, 0))):
        with Locations(Location((33, 75, 0), (0, 0, 270))):
            Circle(SKETCH_13_R)
        with Locations(Location((-25, 75, 0), (0, 0, 270))):
            Circle(SKETCH_13_R)
    extrude(amount=-CUT_EXTRUDE_2_DEPTH, mode=Mode.SUBTRACT)

    # 모따기2
    chamfer_2_edges = [part_2.edges().sort_by_distance(p)[0] for p in [
        (30, 3, 59.9),
        (-30, 3, 64.1),
        (33, 8, -77.1),
        (-25, 8, -77.1),
    ]]
    chamfer(chamfer_2_edges, length=CHAMFER_2_SIZE)

    # 모따기3
    chamfer_3_edges = [part_2.edges().sort_by_distance(p)[0] for p in [
        (31, 16.5, 20.8),
        (31, 21.5, 20.8),
        (-31, 16.5, 20.8),
        (-31, 21.5, 20.8),
        (25, 16.5, -36.2),
        (25, 21.5, -36.2),
        (-25, 16.5, -36.2),
        (-25, 21.5, -36.2),
    ]]
    chamfer(chamfer_3_edges, length=CHAMFER_3_SIZE)


solid = part_2.part
